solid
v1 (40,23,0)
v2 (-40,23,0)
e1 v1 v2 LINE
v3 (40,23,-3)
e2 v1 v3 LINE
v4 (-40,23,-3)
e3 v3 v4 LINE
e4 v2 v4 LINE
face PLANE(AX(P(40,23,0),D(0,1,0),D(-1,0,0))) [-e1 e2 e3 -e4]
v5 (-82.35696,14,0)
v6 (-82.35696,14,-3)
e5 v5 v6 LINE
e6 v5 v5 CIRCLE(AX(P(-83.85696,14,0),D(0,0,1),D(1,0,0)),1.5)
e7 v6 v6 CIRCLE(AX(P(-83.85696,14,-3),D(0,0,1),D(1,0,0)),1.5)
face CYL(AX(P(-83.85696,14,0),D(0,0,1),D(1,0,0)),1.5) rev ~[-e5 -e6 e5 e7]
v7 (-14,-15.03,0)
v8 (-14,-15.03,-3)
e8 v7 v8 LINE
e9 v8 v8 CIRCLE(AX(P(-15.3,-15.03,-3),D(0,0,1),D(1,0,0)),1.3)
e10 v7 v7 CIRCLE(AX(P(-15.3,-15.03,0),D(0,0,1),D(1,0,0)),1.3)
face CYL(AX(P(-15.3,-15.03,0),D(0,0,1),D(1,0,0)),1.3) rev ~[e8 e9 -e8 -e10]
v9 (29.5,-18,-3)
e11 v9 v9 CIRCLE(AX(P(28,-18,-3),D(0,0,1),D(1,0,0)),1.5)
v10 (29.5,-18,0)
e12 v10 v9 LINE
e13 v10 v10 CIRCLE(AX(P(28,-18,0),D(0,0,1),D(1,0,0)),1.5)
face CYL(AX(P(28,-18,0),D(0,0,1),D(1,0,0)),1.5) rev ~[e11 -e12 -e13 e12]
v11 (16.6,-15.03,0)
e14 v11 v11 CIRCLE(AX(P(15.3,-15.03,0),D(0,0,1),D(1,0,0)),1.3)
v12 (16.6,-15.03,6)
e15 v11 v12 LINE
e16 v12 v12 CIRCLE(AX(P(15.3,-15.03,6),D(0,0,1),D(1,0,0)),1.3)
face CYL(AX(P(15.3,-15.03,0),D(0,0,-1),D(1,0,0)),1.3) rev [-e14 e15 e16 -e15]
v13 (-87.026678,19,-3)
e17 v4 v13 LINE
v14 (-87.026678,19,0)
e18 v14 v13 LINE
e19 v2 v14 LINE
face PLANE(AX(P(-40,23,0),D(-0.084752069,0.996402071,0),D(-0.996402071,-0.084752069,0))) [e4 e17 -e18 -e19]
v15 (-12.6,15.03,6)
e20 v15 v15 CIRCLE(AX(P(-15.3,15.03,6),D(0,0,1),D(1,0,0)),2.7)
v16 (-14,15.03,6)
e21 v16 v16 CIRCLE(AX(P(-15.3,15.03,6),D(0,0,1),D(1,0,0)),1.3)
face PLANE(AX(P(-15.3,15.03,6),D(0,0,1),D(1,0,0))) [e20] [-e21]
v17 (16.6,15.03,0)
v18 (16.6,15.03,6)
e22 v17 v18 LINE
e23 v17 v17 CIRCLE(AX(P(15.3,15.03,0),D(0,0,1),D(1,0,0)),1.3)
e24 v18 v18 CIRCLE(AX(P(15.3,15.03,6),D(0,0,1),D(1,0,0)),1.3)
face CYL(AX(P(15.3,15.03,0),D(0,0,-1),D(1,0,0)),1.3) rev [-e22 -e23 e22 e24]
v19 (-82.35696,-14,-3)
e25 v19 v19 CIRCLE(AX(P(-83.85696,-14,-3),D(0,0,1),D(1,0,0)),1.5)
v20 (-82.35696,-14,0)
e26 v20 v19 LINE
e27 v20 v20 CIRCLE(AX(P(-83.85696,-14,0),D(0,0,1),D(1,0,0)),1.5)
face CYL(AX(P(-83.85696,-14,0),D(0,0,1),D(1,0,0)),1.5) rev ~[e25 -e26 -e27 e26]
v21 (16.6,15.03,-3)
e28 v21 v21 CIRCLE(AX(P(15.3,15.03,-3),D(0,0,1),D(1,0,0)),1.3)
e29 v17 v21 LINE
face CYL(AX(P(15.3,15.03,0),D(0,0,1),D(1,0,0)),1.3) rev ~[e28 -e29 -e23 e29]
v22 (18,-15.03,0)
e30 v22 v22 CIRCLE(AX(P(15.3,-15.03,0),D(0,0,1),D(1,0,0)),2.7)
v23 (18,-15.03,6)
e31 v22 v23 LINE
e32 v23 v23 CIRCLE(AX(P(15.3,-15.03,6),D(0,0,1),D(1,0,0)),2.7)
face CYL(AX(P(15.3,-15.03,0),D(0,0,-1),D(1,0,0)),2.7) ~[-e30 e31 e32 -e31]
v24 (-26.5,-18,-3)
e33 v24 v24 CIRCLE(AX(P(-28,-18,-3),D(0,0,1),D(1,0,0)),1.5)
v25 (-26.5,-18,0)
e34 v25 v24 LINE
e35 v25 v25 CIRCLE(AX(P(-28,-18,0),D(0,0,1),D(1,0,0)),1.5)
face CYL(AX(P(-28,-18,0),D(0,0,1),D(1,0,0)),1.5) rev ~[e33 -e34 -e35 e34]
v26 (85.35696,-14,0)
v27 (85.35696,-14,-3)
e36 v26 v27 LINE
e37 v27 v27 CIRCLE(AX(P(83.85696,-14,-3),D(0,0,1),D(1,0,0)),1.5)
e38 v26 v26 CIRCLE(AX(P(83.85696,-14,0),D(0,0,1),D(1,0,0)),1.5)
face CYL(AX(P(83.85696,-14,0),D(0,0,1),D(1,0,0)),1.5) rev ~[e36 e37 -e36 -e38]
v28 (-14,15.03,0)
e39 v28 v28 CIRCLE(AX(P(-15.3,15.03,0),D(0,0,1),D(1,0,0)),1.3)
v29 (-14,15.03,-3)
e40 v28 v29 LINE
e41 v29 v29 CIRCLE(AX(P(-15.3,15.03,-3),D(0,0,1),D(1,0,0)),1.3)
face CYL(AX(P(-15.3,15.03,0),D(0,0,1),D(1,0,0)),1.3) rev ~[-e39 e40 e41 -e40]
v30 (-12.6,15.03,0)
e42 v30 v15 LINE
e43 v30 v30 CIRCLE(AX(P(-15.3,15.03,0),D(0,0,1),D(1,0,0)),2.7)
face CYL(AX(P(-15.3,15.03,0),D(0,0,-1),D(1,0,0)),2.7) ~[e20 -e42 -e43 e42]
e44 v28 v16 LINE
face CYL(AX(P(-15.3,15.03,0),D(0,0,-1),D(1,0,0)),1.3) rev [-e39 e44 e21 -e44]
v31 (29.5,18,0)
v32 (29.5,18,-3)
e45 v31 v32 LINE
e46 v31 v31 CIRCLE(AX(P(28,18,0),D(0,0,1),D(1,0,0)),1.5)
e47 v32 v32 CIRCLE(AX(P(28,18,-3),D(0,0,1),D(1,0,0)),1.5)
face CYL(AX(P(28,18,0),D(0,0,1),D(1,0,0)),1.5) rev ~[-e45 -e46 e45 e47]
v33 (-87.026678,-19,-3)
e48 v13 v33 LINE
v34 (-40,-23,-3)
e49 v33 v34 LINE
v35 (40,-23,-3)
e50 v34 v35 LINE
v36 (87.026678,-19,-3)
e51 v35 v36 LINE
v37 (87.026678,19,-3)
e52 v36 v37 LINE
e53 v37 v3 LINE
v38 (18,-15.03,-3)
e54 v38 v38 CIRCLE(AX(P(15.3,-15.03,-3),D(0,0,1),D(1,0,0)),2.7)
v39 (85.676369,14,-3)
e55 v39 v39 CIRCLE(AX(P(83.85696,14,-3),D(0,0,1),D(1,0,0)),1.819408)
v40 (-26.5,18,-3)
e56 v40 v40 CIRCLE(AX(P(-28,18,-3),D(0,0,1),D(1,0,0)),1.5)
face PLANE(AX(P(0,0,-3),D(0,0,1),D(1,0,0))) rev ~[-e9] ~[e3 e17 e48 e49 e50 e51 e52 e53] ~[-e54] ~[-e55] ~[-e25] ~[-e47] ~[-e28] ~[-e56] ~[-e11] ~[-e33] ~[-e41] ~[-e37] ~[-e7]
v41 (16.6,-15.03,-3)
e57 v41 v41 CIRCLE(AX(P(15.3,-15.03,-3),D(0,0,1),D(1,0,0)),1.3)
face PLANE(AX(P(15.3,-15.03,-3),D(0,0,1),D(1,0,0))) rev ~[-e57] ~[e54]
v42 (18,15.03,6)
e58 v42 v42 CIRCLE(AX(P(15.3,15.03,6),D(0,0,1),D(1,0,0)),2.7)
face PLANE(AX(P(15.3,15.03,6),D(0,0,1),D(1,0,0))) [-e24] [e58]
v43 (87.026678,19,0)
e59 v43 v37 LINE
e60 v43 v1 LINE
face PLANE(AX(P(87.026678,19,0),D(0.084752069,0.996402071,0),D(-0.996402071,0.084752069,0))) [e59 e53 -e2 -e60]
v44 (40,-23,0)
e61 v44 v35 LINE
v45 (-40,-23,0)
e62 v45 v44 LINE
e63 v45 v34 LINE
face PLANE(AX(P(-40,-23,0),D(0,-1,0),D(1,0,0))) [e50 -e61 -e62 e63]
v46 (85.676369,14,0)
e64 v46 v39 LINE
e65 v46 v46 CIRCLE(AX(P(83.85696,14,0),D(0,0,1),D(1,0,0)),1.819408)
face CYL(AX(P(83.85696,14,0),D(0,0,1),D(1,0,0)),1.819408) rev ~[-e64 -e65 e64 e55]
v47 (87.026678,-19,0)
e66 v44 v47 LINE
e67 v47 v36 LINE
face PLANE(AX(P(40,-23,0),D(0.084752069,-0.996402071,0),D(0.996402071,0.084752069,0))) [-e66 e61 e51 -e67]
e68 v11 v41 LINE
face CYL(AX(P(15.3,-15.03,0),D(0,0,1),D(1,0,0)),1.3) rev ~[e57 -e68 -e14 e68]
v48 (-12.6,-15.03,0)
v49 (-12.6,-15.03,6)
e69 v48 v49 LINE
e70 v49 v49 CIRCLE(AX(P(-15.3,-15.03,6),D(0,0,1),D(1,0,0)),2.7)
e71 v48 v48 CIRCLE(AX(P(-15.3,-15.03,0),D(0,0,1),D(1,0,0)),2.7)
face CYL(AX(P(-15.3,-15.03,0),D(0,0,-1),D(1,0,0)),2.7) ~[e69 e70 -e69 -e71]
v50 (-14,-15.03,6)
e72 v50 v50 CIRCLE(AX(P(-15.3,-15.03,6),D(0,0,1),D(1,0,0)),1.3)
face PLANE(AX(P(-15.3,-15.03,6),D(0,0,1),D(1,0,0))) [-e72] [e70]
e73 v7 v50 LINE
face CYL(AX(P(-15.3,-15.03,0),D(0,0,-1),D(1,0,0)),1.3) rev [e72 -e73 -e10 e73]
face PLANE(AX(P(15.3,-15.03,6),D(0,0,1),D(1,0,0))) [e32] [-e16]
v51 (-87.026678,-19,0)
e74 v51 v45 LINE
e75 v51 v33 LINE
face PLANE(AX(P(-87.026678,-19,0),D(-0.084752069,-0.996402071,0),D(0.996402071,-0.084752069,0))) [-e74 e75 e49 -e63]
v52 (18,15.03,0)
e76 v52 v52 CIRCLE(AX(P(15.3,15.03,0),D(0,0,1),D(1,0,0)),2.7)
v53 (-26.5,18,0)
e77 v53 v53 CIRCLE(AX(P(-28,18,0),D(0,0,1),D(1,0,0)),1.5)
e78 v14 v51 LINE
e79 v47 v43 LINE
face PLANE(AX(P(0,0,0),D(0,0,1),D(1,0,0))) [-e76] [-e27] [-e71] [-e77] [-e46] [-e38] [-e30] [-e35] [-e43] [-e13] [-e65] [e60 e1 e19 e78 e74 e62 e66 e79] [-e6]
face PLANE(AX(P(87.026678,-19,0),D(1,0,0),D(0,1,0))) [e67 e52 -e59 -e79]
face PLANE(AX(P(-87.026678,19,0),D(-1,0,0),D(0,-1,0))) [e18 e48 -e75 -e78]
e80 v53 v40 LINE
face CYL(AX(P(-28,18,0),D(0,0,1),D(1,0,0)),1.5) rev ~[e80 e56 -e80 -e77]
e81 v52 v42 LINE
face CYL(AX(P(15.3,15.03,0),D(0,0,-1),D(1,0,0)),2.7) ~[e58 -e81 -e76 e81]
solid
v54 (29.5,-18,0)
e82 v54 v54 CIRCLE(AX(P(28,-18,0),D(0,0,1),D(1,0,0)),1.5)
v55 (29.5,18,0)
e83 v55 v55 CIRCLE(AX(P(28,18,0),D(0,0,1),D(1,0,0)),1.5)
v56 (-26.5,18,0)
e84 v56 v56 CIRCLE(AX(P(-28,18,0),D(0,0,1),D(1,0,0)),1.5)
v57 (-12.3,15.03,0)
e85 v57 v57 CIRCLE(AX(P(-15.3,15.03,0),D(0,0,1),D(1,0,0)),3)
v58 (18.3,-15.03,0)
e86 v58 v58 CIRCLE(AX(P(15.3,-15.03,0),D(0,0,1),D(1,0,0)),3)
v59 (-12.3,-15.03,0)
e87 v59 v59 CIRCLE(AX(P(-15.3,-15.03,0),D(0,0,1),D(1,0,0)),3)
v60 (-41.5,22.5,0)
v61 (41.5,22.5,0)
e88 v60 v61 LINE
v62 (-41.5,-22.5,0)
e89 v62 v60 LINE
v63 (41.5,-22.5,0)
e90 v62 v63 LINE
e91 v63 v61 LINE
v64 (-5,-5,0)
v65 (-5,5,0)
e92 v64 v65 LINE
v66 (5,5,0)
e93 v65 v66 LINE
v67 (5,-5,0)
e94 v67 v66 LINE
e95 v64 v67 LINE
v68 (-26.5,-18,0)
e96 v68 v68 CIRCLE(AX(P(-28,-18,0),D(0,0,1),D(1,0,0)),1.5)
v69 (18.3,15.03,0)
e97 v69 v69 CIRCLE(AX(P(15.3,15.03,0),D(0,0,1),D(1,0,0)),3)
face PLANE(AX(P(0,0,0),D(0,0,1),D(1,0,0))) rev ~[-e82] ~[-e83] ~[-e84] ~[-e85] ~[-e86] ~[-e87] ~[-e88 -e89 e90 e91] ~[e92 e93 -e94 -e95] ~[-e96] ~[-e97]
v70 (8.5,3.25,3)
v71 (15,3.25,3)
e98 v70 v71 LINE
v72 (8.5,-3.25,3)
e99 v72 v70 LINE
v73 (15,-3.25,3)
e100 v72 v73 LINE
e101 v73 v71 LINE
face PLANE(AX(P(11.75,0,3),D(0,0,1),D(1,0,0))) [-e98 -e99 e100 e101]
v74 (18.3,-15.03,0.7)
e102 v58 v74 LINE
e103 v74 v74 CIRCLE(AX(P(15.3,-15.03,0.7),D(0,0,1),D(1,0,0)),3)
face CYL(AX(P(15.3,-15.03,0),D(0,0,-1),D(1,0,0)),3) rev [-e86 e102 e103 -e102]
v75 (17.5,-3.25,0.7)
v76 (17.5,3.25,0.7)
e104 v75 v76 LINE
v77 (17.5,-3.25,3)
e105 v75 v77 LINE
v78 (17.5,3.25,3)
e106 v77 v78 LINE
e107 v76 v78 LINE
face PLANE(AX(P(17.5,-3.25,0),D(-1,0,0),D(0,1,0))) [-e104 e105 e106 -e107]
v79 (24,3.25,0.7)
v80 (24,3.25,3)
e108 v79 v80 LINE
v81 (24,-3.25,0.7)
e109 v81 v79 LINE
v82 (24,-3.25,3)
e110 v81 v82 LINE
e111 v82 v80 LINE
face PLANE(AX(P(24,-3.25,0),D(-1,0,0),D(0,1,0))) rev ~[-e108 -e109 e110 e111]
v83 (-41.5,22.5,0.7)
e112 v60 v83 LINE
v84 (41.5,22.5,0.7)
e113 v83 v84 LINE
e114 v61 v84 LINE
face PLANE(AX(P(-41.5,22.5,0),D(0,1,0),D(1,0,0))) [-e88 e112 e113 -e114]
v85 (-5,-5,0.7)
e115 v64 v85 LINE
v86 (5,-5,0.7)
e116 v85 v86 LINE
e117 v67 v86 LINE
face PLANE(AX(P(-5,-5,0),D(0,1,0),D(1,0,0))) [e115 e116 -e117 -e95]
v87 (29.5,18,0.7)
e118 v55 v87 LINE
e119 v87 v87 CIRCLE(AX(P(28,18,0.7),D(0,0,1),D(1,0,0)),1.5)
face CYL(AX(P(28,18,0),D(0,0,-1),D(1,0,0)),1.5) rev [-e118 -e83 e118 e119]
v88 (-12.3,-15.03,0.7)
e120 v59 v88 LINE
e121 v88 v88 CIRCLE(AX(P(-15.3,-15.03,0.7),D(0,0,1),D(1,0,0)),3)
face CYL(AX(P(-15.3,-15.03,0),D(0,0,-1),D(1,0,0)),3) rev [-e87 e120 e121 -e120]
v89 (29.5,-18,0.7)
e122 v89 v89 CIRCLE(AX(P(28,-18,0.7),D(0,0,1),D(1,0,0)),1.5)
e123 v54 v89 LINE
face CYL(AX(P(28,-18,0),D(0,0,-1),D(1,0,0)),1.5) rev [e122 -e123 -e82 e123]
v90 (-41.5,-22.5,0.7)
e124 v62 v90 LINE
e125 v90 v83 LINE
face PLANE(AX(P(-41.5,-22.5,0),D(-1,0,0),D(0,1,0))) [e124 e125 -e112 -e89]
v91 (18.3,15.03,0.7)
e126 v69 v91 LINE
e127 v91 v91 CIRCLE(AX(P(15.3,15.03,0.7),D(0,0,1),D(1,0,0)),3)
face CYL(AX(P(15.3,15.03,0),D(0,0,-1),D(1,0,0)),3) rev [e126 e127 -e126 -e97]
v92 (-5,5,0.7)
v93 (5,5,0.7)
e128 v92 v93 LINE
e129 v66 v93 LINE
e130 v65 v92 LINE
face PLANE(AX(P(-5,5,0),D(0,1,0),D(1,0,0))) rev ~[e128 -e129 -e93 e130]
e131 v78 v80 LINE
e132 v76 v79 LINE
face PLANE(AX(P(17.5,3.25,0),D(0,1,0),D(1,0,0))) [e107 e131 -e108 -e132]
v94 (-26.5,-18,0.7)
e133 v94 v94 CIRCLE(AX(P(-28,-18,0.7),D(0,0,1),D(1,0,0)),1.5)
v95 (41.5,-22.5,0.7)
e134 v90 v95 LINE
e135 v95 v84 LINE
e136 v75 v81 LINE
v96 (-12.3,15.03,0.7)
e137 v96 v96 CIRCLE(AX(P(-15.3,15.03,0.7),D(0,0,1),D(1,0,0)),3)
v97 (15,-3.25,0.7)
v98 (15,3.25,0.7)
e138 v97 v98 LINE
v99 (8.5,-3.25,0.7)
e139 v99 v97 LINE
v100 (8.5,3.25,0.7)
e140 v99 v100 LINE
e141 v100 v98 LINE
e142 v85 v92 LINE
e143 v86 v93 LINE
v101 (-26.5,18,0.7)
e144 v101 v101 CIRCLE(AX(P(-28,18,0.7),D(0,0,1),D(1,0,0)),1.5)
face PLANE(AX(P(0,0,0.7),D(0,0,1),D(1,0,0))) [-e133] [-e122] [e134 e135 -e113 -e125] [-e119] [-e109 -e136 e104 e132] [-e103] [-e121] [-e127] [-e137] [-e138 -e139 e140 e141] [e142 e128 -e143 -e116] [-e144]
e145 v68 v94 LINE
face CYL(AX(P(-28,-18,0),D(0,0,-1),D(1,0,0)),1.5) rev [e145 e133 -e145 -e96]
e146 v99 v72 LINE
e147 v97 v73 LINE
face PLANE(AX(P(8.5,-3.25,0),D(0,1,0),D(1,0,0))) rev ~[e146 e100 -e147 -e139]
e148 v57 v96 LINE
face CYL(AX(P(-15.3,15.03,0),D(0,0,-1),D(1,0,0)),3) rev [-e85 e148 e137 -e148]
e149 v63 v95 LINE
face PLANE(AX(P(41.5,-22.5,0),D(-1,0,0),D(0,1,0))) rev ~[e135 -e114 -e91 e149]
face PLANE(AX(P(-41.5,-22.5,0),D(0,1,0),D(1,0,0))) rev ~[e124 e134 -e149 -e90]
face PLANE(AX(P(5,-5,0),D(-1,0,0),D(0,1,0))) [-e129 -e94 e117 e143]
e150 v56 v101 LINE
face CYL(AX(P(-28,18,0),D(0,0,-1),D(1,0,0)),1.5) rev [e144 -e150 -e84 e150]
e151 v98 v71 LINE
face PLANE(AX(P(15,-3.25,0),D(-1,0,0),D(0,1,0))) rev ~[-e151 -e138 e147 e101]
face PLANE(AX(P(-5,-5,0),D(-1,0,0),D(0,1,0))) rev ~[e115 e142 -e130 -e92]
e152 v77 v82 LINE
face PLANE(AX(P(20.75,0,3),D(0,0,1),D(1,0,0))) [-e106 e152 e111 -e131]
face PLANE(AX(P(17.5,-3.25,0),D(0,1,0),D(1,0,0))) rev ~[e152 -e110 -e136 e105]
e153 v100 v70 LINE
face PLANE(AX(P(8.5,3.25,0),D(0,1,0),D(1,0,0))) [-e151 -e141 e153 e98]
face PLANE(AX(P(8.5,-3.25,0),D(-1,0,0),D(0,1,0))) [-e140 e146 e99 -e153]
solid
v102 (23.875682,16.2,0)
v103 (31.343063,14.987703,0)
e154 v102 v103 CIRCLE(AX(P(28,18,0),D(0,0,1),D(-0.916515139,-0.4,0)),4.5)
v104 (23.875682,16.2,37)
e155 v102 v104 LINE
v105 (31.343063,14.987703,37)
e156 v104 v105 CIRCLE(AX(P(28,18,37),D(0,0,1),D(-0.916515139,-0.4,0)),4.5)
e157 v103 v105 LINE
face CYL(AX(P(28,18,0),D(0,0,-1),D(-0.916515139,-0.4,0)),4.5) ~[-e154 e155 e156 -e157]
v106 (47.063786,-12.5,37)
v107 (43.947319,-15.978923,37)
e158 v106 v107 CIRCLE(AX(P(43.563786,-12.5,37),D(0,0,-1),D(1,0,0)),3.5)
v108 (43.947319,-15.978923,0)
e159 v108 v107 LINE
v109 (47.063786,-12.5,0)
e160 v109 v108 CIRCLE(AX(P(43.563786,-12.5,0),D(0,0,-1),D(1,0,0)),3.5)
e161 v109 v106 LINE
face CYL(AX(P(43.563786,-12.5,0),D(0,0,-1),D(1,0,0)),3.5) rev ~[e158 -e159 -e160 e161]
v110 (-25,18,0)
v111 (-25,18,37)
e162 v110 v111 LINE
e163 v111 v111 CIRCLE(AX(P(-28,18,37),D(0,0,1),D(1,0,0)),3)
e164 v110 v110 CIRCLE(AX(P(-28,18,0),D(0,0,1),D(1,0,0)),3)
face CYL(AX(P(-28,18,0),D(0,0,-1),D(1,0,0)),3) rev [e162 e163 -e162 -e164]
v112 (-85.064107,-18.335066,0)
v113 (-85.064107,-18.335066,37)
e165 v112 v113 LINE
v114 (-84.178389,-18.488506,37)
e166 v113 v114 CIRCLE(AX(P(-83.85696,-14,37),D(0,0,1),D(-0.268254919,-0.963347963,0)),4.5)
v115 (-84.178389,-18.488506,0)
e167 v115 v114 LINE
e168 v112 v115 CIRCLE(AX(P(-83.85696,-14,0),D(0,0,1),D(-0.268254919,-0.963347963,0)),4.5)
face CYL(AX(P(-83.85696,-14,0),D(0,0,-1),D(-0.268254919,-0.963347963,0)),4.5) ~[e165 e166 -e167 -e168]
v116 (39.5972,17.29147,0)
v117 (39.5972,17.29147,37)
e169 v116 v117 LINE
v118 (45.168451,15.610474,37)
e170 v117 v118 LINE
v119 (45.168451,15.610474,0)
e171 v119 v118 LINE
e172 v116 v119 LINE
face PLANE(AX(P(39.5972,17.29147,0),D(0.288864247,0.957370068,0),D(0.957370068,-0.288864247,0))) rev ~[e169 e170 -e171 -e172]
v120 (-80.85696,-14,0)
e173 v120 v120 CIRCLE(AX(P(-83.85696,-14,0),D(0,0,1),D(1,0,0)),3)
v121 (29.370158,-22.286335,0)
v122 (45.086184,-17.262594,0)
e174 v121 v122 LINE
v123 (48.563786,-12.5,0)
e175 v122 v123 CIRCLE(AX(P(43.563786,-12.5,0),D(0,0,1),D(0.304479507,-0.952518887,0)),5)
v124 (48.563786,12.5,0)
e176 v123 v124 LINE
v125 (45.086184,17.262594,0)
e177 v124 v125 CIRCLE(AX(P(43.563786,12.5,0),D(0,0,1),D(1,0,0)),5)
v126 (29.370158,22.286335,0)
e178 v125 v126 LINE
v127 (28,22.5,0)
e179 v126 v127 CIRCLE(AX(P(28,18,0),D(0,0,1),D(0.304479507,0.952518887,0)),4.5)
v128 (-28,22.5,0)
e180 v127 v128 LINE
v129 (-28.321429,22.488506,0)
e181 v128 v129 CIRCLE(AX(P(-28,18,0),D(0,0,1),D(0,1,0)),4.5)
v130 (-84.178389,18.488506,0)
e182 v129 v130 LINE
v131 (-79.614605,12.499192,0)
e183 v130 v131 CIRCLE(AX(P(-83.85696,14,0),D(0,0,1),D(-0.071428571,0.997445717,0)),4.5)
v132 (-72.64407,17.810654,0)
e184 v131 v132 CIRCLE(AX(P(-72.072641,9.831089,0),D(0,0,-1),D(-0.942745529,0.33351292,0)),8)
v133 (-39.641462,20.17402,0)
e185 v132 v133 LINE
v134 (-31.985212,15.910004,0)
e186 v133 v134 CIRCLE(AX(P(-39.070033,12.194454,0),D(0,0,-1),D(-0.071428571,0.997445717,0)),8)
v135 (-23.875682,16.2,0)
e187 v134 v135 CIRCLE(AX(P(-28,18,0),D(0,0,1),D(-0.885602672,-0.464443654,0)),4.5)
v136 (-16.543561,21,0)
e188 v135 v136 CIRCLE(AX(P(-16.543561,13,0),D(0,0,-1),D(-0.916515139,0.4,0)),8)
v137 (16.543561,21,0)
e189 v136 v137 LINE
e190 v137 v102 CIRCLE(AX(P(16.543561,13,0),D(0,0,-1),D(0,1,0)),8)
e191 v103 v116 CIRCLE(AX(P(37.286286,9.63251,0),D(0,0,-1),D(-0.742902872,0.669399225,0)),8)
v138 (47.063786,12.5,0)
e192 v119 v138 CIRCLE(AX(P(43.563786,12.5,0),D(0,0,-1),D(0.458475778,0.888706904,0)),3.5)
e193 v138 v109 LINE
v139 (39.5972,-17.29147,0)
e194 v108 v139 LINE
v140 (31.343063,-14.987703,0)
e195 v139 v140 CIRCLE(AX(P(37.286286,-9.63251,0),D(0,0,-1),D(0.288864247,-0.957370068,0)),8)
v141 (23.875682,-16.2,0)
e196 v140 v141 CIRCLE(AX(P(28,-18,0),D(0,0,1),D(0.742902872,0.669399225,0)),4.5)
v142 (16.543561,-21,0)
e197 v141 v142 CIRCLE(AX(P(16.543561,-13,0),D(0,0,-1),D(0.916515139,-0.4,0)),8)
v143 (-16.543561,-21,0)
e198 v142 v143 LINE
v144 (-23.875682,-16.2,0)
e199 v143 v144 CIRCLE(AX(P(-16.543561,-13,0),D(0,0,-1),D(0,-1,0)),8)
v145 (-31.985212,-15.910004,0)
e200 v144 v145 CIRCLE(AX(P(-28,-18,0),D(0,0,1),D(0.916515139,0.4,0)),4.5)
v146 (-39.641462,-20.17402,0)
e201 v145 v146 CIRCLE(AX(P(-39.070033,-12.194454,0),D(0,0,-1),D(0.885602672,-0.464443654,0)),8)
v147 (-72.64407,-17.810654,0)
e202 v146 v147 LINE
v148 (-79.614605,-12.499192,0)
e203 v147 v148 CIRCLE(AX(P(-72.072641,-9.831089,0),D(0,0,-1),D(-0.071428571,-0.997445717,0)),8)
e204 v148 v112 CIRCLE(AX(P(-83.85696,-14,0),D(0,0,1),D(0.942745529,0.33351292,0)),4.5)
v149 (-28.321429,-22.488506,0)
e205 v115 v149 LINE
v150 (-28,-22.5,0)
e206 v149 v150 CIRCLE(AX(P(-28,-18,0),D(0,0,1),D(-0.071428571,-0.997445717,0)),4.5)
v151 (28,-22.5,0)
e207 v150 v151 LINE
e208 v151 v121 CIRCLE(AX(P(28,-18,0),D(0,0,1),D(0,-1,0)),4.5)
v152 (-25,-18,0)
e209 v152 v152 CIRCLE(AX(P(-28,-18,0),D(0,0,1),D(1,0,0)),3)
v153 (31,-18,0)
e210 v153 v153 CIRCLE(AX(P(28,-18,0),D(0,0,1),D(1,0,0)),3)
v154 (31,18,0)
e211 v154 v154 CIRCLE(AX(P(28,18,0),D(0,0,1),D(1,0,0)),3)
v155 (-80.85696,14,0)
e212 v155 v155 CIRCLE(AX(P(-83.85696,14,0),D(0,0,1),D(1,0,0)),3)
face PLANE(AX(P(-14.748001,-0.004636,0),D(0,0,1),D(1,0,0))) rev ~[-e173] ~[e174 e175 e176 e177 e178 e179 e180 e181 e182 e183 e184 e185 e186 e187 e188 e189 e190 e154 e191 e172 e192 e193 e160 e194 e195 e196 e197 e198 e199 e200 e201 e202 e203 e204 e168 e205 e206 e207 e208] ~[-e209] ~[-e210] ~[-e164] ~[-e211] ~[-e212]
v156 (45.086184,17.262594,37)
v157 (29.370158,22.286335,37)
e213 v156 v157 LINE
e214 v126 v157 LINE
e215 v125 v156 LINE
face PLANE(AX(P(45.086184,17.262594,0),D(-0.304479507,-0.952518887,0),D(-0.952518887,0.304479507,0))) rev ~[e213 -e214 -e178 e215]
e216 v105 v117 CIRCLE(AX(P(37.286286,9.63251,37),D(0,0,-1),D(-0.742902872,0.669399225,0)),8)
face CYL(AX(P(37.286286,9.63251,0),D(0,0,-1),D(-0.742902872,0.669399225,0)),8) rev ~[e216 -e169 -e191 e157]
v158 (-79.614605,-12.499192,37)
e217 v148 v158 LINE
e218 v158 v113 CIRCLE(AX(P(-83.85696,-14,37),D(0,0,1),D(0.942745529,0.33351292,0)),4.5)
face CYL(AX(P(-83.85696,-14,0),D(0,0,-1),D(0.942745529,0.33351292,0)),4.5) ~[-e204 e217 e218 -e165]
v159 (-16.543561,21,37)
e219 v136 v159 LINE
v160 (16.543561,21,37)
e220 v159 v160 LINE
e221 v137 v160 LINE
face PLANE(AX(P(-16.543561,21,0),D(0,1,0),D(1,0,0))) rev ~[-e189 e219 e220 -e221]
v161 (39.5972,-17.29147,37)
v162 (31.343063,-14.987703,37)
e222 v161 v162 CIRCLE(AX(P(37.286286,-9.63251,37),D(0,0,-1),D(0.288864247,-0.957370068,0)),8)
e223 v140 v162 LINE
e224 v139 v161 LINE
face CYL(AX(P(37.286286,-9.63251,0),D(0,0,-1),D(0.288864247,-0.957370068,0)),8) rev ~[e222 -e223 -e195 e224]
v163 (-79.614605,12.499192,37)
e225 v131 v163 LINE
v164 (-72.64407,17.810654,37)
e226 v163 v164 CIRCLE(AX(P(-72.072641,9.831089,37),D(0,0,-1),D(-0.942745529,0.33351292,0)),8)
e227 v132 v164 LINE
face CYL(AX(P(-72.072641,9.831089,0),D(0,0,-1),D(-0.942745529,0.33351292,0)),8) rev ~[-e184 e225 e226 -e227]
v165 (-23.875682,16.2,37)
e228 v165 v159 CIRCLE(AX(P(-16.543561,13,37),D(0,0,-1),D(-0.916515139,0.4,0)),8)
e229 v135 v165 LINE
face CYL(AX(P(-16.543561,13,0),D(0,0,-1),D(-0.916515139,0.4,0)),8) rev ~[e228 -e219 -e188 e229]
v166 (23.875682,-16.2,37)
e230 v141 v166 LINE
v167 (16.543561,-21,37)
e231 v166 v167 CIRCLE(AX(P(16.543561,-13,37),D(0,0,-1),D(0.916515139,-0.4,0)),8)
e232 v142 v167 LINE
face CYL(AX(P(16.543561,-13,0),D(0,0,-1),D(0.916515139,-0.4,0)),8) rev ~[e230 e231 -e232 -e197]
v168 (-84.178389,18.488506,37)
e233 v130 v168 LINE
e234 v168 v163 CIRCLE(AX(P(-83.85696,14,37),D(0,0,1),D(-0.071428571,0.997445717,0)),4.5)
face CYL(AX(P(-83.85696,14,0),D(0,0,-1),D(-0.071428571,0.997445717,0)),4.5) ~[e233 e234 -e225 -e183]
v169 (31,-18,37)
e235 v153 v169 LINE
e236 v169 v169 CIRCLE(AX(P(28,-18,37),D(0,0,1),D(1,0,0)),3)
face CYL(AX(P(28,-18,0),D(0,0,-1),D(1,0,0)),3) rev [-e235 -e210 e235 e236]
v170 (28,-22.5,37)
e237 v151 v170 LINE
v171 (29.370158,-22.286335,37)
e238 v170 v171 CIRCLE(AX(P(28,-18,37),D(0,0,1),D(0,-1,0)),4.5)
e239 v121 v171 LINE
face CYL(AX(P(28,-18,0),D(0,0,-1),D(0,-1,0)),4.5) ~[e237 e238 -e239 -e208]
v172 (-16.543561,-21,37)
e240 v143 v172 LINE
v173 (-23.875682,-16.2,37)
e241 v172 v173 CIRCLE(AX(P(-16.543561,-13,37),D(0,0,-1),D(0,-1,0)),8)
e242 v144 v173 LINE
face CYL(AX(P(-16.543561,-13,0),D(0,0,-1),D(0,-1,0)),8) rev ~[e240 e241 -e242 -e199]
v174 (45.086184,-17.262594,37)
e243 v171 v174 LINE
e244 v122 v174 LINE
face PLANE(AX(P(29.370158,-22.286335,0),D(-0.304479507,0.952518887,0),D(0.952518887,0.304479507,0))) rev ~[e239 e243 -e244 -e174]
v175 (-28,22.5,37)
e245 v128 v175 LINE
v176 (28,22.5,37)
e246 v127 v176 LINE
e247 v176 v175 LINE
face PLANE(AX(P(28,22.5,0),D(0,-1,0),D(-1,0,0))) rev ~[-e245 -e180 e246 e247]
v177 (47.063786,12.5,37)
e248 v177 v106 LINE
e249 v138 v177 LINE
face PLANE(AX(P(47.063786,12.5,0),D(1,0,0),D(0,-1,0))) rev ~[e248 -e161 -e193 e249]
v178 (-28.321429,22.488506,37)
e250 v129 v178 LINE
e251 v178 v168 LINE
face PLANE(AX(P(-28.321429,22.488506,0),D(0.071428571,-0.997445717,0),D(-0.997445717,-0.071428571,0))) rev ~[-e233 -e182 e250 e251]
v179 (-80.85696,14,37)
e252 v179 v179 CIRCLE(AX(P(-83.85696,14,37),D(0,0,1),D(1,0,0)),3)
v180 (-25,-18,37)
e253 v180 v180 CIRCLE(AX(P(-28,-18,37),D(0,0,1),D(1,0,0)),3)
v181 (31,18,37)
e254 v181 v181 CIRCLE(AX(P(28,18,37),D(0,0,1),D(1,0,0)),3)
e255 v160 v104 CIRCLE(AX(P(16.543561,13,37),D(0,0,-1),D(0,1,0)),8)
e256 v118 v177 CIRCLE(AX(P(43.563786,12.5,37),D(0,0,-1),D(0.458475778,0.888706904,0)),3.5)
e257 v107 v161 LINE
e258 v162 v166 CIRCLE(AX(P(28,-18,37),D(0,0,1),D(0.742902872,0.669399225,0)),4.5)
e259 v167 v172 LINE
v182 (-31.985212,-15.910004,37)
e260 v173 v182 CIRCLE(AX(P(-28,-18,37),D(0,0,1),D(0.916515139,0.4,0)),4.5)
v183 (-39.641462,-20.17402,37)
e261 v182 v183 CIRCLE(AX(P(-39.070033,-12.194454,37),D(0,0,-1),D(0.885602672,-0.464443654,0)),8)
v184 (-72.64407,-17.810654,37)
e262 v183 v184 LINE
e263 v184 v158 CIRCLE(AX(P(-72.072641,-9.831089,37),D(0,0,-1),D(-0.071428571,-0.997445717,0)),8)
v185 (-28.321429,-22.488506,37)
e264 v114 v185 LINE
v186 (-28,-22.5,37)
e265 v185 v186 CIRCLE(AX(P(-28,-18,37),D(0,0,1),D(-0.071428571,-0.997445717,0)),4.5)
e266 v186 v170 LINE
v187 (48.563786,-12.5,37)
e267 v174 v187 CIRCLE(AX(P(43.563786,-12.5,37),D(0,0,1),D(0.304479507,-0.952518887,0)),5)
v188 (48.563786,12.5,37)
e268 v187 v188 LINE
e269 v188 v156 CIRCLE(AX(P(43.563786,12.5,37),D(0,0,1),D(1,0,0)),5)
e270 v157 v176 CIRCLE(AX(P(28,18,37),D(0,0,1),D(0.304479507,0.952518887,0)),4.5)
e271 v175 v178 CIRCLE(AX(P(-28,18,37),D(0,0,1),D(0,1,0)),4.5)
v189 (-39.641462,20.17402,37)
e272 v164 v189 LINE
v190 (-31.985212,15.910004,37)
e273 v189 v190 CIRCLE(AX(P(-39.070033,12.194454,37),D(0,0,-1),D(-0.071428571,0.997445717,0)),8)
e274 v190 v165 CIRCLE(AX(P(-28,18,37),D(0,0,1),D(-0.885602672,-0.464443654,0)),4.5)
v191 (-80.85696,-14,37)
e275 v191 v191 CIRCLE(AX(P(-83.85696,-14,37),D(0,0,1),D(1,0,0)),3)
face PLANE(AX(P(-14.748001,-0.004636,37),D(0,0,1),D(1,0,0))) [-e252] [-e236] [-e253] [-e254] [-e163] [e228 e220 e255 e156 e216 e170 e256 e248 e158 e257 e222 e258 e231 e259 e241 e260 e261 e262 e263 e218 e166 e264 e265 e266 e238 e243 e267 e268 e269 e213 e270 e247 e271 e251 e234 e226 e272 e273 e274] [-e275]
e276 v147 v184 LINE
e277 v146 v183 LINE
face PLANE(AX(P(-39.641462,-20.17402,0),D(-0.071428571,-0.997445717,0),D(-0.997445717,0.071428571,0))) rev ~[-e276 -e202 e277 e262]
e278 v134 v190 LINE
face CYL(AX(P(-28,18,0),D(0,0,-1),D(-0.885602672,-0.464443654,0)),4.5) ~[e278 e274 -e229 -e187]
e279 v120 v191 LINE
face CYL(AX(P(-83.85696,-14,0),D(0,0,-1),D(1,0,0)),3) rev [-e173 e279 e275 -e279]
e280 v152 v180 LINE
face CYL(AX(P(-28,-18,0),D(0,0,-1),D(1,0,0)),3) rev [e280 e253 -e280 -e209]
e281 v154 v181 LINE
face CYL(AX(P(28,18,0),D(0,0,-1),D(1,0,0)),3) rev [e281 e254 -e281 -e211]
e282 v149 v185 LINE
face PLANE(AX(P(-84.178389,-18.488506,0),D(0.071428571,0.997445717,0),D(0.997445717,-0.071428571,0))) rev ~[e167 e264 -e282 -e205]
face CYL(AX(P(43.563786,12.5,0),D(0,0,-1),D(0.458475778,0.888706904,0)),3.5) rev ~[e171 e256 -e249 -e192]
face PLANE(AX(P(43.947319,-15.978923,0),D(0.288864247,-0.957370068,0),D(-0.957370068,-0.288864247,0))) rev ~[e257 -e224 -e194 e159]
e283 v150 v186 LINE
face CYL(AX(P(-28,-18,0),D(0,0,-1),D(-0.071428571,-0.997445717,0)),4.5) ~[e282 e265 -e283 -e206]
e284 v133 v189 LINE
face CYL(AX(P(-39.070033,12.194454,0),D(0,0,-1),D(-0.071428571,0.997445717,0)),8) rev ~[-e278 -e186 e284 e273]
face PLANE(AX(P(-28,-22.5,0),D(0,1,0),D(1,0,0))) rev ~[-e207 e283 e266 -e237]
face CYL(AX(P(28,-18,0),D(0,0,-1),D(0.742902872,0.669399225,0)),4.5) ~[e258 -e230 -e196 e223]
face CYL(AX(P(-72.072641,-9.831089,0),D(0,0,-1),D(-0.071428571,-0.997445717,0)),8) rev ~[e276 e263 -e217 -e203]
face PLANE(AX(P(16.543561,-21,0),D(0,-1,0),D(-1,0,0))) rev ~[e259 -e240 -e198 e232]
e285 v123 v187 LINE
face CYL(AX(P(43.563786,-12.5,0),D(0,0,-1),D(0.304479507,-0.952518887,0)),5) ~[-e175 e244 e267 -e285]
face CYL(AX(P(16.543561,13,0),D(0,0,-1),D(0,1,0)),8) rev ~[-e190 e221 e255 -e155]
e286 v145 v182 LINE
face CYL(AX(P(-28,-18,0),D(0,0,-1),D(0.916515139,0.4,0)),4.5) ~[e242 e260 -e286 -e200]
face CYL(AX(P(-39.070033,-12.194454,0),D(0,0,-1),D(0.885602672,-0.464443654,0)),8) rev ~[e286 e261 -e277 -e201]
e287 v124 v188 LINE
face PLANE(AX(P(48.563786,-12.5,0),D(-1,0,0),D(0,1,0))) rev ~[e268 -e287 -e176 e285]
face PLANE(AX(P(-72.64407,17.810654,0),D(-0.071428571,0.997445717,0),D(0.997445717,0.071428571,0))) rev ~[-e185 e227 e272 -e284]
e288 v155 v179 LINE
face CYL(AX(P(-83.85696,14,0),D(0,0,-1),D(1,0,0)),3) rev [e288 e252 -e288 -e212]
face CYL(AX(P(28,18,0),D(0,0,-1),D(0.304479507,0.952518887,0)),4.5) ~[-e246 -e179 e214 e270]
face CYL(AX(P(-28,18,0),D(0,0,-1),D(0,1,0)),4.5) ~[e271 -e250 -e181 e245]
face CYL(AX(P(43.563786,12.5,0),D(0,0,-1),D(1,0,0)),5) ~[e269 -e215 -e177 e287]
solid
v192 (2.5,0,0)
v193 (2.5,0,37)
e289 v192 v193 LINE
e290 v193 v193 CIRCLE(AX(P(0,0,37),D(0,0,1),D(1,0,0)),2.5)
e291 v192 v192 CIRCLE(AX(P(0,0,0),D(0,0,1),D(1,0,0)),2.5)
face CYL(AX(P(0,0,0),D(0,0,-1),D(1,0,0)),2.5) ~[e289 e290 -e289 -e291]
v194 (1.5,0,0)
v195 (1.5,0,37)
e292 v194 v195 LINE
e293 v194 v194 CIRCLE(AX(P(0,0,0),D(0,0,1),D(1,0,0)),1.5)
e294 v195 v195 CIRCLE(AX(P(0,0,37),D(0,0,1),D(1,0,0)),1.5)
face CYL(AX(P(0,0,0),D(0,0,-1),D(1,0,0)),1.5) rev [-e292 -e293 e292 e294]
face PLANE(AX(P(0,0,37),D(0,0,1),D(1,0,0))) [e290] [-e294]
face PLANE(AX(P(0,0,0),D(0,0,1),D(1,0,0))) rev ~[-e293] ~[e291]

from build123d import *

# Parameters (mm, degrees)
F0_R          = 1.5
F0_R_2        = 2.7
F0_R_3        = 1.819408366
F1_DEPTH      = 3
F0_R_4        = 1.3
F2_DEPTH      = 6
F2_DEPTH_BACK = 3
F3_DEPTH      = 6
F3_DEPTH_BACK = 3
F4_DEPTH      = 6
F4_DEPTH_BACK = 3
F5_DEPTH      = 6
F5_DEPTH_BACK = 3
F6_W          = 83
F6_H          = 45
F6_R          = 1.5
F6_R_2        = 3
F6_W_2        = 10
F6_H_2        = 10
F6_W_3        = 6.5
F6_H_3        = 6.5
F7_DEPTH      = 0.7
F8_DEPTH      = 3
F9_DEPTH      = 3
F10_R         = 2.5
F10_R_2       = 1.5
F11_DEPTH     = 37
F12_R         = 3
F13_DEPTH     = 37


with BuildPart() as f1:
    # F0 (on Top) → F1 (new body)
    with BuildSketch(Plane.XY):
        Polygon((40, 23), (-40, 23), (-87.0266780257, 19), (-87.0266780257, -19), (-40, -23), (40, -23), (87.0266780257, -19), (87.0266780257, 19), align=None)
        with Locations((-83.8569601751, -14)):
            Circle(F0_R, mode=Mode.SUBTRACT)
        with Locations((-28, -18)):
            Circle(F0_R, mode=Mode.SUBTRACT)
        with Locations((-15.3, -15.03)):
            Circle(F0_R_2, mode=Mode.SUBTRACT)
        with Locations((28, -18)):
            Circle(F0_R, mode=Mode.SUBTRACT)
        with Locations((15.3, -15.03)):
            Circle(F0_R_2, mode=Mode.SUBTRACT)
        with Locations((83.8569601751, -14)):
            Circle(F0_R, mode=Mode.SUBTRACT)
        with Locations((-83.8569601751, 14)):
            Circle(F0_R, mode=Mode.SUBTRACT)
        with Locations((-15.3, 15.03)):
            Circle(F0_R_2, mode=Mode.SUBTRACT)
        with Locations((-28, 18)):
            Circle(F0_R, mode=Mode.SUBTRACT)
        with Locations((15.3, 15.03)):
            Circle(F0_R_2, mode=Mode.SUBTRACT)
        with Locations((28, 18)):
            Circle(F0_R, mode=Mode.SUBTRACT)
        with Locations((83.8569601751, 14)):
            Circle(F0_R_3, mode=Mode.SUBTRACT)
    extrude(amount=-F1_DEPTH)

    # F0 (on Top) → F2 (join, two sides)
    with BuildSketch(Plane.XY) as f2_sk:
        with Locations((-15.3, 15.03)):
            Circle(F0_R_2)
        with Locations((-15.3, 15.03)):
            Circle(F0_R_4, mode=Mode.SUBTRACT)
    extrude(amount=F2_DEPTH)
    extrude(f2_sk.sketch, amount=-F2_DEPTH_BACK)

    # F0 (on Top) → F3 (join, two sides)
    with BuildSketch(Plane.XY) as f3_sk:
        with Locations((15.3, 15.03)):
            Circle(F0_R_2)
        with Locations((15.3, 15.03)):
            Circle(F0_R_4, mode=Mode.SUBTRACT)
    extrude(amount=F3_DEPTH)
    extrude(f3_sk.sketch, amount=-F3_DEPTH_BACK)

    # F0 (on Top) → F4 (join, two sides)
    with BuildSketch(Plane.XY) as f4_sk:
        with Locations((-15.3, -15.03)):
            Circle(F0_R_2)
        with Locations((-15.3, -15.03)):
            Circle(F0_R_4, mode=Mode.SUBTRACT)
    extrude(amount=F4_DEPTH)
    extrude(f4_sk.sketch, amount=-F4_DEPTH_BACK)

    # F0 (on Top) → F5 (join, two sides)
    with BuildSketch(Plane.XY) as f5_sk:
        with Locations((15.3, -15.03)):
            Circle(F0_R_2)
        with Locations((15.3, -15.03)):
            Circle(F0_R_4, mode=Mode.SUBTRACT)
    extrude(amount=F5_DEPTH)
    extrude(f5_sk.sketch, amount=-F5_DEPTH_BACK)


with BuildPart() as f7:
    # F6 (on Top) → F7 (new body)
    with BuildSketch(Plane.XY):
        Rectangle(F6_W, F6_H)
        with Locations((-28, -18)):
            Circle(F6_R, mode=Mode.SUBTRACT)
        with Locations((-15.3, -15.03)):
            Circle(F6_R_2, mode=Mode.SUBTRACT)
        with Locations((15.3, -15.03)):
            Circle(F6_R_2, mode=Mode.SUBTRACT)
        with Locations((28, -18)):
            Circle(F6_R, mode=Mode.SUBTRACT)
        with Locations((-28, 18)):
            Circle(F6_R, mode=Mode.SUBTRACT)
        with Locations((-15.3, 15.03)):
            Circle(F6_R_2, mode=Mode.SUBTRACT)
        Rectangle(F6_W_2, F6_H_2, mode=Mode.SUBTRACT)
        with Locations((11.75, 0)):
            Rectangle(F6_W_3, F6_H_3, mode=Mode.SUBTRACT)
        with Locations((20.75, 0)):
            Rectangle(F6_W_3, F6_H_3, mode=Mode.SUBTRACT)
        with Locations((15.3, 15.03)):
            Circle(F6_R_2, mode=Mode.SUBTRACT)
        with Locations((28, 18)):
            Circle(F6_R, mode=Mode.SUBTRACT)
    extrude(amount=F7_DEPTH)

    # F6 (on Top) → F8 (join)
    with BuildSketch(Plane.XY):
        with Locations((11.75, 0)):
            Rectangle(F6_W_3, F6_H_3)
    extrude(amount=F8_DEPTH)

    # F6 (on Top) → F9 (join)
    with BuildSketch(Plane.XY):
        with Locations((20.75, 0)):
            Rectangle(F6_W_3, F6_H_3)
    extrude(amount=F9_DEPTH)


with BuildPart() as f11:
    # F10 (on Top) → F11 (new body)
    with BuildSketch(Plane.XY):
        Circle(F10_R)
        Circle(F10_R_2, mode=Mode.SUBTRACT)
    extrude(amount=F11_DEPTH)


with BuildPart() as f13:
    # F12 (on Top) → F13 (new body)
    with BuildSketch(Plane.XY):
        with BuildLine():
            ThreePointArc((-39.6414619684, 20.1740200639), (-35.1775366862, 19.1836223263), (-31.9852120229, 15.9100035568))
            ThreePointArc((-31.9852120229, 15.9100035568), (-27.8391829885, 13.502874486), (-23.8756818745, 16.2))
            ThreePointArc((-23.8756818745, 16.2), (-20.9253412227, 19.6932802123), (-16.5435607626, 21))
            Line((-16.5435607626, 21), (16.5435607626, 21))
            ThreePointArc((16.5435607626, 21), (20.9253412227, 19.6932802123), (23.8756818745, 16.2))
            ThreePointArc((23.8756818745, 16.2), (27.2788858407, 13.5581541709), (31.3430629249, 14.9877034873))
            ThreePointArc((31.3430629249, 14.9877034873), (35.1356458892, 17.3380108085), (39.5971998807, 17.291470229))
            Line((39.5971998807, 17.291470229), (45.1684511965, 15.6104741628))
            ThreePointArc((45.1684511965, 15.6104741628), (46.5526259047, 14.3212182344), (47.0637859721, 12.5))
            Line((47.0637859721, 12.5), (47.0637859721, -12.5))
            ThreePointArc((47.0637859721, -12.5), (46.170734794, -14.8353410543), (43.9473186349, -15.9789226345))
            Line((43.9473186349, -15.9789226345), (39.5971998807, -17.291470229))
            ThreePointArc((39.5971998807, -17.291470229), (35.1356458892, -17.3380108085), (31.3430629249, -14.9877034873))
            ThreePointArc((31.3430629249, -14.9877034873), (27.2788858407, -13.5581541709), (23.8756818745, -16.2))
            ThreePointArc((23.8756818745, -16.2), (20.9253412227, -19.6932802123), (16.5435607626, -21))
            Line((16.5435607626, -21), (-16.5435607626, -21))
            ThreePointArc((-16.5435607626, -21), (-20.9253412227, -19.6932802123), (-23.8756818745, -16.2))
            ThreePointArc((-23.8756818745, -16.2), (-27.8391829885, -13.502874486), (-31.9852120229, -15.9100035568))
            ThreePointArc((-31.9852120229, -15.9100035568), (-35.1775366862, -19.1836223263), (-39.6414619684, -20.1740200639))
            Line((-39.6414619684, -20.1740200639), (-72.6440696352, -17.8106542406))
            ThreePointArc((-72.6440696352, -17.8106542406), (-76.921320662, -16.1942878659), (-79.614605295, -12.4991918605))
            ThreePointArc((-79.614605295, -12.4991918605), (-87.1459536038, -10.9287588461), (-85.0641073106, -18.3350658349))
            Line((-85.0641073106, -18.3350658349), (-84.1783887465, -18.4885057284))
            Line((-84.1783887465, -18.4885057284), (-28.3214285714, -22.4885057284))
            ThreePointArc((-28.3214285714, -22.4885057284), (-28.1608170115, -22.497125514), (-28, -22.5))
            Line((-28, -22.5), (28, -22.5))
            ThreePointArc((28, -22.5), (28.693358688, -22.4462628948), (29.3701577809, -22.286334991))
            Line((29.3701577809, -22.286334991), (45.0861835065, -17.2625944345))
            ThreePointArc((45.0861835065, -17.2625944345), (47.6018540542, -15.4485600153), (48.5637859721, -12.5))
            Line((48.5637859721, -12.5), (48.5637859721, 12.5))
            ThreePointArc((48.5637859721, 12.5), (47.6018540542, 15.4485600153), (45.0861835065, 17.2625944345))
            Line((45.0861835065, 17.2625944345), (29.3701577809, 22.286334991))
            ThreePointArc((29.3701577809, 22.286334991), (28.693358688, 22.4462628948), (28, 22.5))
            Line((28, 22.5), (-28, 22.5))
            ThreePointArc((-28, 22.5), (-28.1608170115, 22.497125514), (-28.3214285714, 22.4885057284))
            Line((-28.3214285714, 22.4885057284), (-84.1783887465, 18.4885057284))
            ThreePointArc((-84.1783887465, 18.4885057284), (-87.4362598177, 11.272617726), (-79.614605295, 12.4991918605))
            ThreePointArc((-79.614605295, 12.4991918605), (-76.921320662, 16.1942878659), (-72.6440696352, 17.8106542406))
            Line((-72.6440696352, 17.8106542406), (-39.6414619684, 20.1740200639))
        make_face()
        with Locations((-83.8569601751, -14)):
            Circle(F12_R, mode=Mode.SUBTRACT)
        with Locations((-28, -18)):
            Circle(F12_R, mode=Mode.SUBTRACT)
        with Locations((28, -18)):
            Circle(F12_R, mode=Mode.SUBTRACT)
        with Locations((-83.8569601751, 14)):
            Circle(F12_R, mode=Mode.SUBTRACT)
        with BuildLine():
            Line((-82.8338199445, 18.3821437754), (-84.1783887465, 18.4885057284))
            ThreePointArc((-84.1783887465, 18.4885057284), (-83.5020967796, 18.4859861759), (-82.8338199445, 18.3821437754))
        make_face(mode=Mode.SUBTRACT)
        with Locations((-28, 18)):
            Circle(F12_R, mode=Mode.SUBTRACT)
        with Locations((28, 18)):
            Circle(F12_R, mode=Mode.SUBTRACT)
        with BuildLine():
            ThreePointArc((-82.8338199445, 18.3821437754), (-83.5020967796, 18.4859861759), (-84.1783887465, 18.4885057284))
            Line((-84.1783887465, 18.4885057284), (-82.8338199445, 18.3821437754))
        make_face()
        with BuildLine():
            ThreePointArc((-85.0641073106, -18.3350658349), (-84.625088988, -18.4339573889), (-84.1783887465, -18.4885057284))
            Line((-84.1783887465, -18.4885057284), (-85.0641073106, -18.3350658349))
        make_face()
    extrude(amount=F13_DEPTH)


solid = Compound([f1.part, f7.part, f11.part, f13.part])
